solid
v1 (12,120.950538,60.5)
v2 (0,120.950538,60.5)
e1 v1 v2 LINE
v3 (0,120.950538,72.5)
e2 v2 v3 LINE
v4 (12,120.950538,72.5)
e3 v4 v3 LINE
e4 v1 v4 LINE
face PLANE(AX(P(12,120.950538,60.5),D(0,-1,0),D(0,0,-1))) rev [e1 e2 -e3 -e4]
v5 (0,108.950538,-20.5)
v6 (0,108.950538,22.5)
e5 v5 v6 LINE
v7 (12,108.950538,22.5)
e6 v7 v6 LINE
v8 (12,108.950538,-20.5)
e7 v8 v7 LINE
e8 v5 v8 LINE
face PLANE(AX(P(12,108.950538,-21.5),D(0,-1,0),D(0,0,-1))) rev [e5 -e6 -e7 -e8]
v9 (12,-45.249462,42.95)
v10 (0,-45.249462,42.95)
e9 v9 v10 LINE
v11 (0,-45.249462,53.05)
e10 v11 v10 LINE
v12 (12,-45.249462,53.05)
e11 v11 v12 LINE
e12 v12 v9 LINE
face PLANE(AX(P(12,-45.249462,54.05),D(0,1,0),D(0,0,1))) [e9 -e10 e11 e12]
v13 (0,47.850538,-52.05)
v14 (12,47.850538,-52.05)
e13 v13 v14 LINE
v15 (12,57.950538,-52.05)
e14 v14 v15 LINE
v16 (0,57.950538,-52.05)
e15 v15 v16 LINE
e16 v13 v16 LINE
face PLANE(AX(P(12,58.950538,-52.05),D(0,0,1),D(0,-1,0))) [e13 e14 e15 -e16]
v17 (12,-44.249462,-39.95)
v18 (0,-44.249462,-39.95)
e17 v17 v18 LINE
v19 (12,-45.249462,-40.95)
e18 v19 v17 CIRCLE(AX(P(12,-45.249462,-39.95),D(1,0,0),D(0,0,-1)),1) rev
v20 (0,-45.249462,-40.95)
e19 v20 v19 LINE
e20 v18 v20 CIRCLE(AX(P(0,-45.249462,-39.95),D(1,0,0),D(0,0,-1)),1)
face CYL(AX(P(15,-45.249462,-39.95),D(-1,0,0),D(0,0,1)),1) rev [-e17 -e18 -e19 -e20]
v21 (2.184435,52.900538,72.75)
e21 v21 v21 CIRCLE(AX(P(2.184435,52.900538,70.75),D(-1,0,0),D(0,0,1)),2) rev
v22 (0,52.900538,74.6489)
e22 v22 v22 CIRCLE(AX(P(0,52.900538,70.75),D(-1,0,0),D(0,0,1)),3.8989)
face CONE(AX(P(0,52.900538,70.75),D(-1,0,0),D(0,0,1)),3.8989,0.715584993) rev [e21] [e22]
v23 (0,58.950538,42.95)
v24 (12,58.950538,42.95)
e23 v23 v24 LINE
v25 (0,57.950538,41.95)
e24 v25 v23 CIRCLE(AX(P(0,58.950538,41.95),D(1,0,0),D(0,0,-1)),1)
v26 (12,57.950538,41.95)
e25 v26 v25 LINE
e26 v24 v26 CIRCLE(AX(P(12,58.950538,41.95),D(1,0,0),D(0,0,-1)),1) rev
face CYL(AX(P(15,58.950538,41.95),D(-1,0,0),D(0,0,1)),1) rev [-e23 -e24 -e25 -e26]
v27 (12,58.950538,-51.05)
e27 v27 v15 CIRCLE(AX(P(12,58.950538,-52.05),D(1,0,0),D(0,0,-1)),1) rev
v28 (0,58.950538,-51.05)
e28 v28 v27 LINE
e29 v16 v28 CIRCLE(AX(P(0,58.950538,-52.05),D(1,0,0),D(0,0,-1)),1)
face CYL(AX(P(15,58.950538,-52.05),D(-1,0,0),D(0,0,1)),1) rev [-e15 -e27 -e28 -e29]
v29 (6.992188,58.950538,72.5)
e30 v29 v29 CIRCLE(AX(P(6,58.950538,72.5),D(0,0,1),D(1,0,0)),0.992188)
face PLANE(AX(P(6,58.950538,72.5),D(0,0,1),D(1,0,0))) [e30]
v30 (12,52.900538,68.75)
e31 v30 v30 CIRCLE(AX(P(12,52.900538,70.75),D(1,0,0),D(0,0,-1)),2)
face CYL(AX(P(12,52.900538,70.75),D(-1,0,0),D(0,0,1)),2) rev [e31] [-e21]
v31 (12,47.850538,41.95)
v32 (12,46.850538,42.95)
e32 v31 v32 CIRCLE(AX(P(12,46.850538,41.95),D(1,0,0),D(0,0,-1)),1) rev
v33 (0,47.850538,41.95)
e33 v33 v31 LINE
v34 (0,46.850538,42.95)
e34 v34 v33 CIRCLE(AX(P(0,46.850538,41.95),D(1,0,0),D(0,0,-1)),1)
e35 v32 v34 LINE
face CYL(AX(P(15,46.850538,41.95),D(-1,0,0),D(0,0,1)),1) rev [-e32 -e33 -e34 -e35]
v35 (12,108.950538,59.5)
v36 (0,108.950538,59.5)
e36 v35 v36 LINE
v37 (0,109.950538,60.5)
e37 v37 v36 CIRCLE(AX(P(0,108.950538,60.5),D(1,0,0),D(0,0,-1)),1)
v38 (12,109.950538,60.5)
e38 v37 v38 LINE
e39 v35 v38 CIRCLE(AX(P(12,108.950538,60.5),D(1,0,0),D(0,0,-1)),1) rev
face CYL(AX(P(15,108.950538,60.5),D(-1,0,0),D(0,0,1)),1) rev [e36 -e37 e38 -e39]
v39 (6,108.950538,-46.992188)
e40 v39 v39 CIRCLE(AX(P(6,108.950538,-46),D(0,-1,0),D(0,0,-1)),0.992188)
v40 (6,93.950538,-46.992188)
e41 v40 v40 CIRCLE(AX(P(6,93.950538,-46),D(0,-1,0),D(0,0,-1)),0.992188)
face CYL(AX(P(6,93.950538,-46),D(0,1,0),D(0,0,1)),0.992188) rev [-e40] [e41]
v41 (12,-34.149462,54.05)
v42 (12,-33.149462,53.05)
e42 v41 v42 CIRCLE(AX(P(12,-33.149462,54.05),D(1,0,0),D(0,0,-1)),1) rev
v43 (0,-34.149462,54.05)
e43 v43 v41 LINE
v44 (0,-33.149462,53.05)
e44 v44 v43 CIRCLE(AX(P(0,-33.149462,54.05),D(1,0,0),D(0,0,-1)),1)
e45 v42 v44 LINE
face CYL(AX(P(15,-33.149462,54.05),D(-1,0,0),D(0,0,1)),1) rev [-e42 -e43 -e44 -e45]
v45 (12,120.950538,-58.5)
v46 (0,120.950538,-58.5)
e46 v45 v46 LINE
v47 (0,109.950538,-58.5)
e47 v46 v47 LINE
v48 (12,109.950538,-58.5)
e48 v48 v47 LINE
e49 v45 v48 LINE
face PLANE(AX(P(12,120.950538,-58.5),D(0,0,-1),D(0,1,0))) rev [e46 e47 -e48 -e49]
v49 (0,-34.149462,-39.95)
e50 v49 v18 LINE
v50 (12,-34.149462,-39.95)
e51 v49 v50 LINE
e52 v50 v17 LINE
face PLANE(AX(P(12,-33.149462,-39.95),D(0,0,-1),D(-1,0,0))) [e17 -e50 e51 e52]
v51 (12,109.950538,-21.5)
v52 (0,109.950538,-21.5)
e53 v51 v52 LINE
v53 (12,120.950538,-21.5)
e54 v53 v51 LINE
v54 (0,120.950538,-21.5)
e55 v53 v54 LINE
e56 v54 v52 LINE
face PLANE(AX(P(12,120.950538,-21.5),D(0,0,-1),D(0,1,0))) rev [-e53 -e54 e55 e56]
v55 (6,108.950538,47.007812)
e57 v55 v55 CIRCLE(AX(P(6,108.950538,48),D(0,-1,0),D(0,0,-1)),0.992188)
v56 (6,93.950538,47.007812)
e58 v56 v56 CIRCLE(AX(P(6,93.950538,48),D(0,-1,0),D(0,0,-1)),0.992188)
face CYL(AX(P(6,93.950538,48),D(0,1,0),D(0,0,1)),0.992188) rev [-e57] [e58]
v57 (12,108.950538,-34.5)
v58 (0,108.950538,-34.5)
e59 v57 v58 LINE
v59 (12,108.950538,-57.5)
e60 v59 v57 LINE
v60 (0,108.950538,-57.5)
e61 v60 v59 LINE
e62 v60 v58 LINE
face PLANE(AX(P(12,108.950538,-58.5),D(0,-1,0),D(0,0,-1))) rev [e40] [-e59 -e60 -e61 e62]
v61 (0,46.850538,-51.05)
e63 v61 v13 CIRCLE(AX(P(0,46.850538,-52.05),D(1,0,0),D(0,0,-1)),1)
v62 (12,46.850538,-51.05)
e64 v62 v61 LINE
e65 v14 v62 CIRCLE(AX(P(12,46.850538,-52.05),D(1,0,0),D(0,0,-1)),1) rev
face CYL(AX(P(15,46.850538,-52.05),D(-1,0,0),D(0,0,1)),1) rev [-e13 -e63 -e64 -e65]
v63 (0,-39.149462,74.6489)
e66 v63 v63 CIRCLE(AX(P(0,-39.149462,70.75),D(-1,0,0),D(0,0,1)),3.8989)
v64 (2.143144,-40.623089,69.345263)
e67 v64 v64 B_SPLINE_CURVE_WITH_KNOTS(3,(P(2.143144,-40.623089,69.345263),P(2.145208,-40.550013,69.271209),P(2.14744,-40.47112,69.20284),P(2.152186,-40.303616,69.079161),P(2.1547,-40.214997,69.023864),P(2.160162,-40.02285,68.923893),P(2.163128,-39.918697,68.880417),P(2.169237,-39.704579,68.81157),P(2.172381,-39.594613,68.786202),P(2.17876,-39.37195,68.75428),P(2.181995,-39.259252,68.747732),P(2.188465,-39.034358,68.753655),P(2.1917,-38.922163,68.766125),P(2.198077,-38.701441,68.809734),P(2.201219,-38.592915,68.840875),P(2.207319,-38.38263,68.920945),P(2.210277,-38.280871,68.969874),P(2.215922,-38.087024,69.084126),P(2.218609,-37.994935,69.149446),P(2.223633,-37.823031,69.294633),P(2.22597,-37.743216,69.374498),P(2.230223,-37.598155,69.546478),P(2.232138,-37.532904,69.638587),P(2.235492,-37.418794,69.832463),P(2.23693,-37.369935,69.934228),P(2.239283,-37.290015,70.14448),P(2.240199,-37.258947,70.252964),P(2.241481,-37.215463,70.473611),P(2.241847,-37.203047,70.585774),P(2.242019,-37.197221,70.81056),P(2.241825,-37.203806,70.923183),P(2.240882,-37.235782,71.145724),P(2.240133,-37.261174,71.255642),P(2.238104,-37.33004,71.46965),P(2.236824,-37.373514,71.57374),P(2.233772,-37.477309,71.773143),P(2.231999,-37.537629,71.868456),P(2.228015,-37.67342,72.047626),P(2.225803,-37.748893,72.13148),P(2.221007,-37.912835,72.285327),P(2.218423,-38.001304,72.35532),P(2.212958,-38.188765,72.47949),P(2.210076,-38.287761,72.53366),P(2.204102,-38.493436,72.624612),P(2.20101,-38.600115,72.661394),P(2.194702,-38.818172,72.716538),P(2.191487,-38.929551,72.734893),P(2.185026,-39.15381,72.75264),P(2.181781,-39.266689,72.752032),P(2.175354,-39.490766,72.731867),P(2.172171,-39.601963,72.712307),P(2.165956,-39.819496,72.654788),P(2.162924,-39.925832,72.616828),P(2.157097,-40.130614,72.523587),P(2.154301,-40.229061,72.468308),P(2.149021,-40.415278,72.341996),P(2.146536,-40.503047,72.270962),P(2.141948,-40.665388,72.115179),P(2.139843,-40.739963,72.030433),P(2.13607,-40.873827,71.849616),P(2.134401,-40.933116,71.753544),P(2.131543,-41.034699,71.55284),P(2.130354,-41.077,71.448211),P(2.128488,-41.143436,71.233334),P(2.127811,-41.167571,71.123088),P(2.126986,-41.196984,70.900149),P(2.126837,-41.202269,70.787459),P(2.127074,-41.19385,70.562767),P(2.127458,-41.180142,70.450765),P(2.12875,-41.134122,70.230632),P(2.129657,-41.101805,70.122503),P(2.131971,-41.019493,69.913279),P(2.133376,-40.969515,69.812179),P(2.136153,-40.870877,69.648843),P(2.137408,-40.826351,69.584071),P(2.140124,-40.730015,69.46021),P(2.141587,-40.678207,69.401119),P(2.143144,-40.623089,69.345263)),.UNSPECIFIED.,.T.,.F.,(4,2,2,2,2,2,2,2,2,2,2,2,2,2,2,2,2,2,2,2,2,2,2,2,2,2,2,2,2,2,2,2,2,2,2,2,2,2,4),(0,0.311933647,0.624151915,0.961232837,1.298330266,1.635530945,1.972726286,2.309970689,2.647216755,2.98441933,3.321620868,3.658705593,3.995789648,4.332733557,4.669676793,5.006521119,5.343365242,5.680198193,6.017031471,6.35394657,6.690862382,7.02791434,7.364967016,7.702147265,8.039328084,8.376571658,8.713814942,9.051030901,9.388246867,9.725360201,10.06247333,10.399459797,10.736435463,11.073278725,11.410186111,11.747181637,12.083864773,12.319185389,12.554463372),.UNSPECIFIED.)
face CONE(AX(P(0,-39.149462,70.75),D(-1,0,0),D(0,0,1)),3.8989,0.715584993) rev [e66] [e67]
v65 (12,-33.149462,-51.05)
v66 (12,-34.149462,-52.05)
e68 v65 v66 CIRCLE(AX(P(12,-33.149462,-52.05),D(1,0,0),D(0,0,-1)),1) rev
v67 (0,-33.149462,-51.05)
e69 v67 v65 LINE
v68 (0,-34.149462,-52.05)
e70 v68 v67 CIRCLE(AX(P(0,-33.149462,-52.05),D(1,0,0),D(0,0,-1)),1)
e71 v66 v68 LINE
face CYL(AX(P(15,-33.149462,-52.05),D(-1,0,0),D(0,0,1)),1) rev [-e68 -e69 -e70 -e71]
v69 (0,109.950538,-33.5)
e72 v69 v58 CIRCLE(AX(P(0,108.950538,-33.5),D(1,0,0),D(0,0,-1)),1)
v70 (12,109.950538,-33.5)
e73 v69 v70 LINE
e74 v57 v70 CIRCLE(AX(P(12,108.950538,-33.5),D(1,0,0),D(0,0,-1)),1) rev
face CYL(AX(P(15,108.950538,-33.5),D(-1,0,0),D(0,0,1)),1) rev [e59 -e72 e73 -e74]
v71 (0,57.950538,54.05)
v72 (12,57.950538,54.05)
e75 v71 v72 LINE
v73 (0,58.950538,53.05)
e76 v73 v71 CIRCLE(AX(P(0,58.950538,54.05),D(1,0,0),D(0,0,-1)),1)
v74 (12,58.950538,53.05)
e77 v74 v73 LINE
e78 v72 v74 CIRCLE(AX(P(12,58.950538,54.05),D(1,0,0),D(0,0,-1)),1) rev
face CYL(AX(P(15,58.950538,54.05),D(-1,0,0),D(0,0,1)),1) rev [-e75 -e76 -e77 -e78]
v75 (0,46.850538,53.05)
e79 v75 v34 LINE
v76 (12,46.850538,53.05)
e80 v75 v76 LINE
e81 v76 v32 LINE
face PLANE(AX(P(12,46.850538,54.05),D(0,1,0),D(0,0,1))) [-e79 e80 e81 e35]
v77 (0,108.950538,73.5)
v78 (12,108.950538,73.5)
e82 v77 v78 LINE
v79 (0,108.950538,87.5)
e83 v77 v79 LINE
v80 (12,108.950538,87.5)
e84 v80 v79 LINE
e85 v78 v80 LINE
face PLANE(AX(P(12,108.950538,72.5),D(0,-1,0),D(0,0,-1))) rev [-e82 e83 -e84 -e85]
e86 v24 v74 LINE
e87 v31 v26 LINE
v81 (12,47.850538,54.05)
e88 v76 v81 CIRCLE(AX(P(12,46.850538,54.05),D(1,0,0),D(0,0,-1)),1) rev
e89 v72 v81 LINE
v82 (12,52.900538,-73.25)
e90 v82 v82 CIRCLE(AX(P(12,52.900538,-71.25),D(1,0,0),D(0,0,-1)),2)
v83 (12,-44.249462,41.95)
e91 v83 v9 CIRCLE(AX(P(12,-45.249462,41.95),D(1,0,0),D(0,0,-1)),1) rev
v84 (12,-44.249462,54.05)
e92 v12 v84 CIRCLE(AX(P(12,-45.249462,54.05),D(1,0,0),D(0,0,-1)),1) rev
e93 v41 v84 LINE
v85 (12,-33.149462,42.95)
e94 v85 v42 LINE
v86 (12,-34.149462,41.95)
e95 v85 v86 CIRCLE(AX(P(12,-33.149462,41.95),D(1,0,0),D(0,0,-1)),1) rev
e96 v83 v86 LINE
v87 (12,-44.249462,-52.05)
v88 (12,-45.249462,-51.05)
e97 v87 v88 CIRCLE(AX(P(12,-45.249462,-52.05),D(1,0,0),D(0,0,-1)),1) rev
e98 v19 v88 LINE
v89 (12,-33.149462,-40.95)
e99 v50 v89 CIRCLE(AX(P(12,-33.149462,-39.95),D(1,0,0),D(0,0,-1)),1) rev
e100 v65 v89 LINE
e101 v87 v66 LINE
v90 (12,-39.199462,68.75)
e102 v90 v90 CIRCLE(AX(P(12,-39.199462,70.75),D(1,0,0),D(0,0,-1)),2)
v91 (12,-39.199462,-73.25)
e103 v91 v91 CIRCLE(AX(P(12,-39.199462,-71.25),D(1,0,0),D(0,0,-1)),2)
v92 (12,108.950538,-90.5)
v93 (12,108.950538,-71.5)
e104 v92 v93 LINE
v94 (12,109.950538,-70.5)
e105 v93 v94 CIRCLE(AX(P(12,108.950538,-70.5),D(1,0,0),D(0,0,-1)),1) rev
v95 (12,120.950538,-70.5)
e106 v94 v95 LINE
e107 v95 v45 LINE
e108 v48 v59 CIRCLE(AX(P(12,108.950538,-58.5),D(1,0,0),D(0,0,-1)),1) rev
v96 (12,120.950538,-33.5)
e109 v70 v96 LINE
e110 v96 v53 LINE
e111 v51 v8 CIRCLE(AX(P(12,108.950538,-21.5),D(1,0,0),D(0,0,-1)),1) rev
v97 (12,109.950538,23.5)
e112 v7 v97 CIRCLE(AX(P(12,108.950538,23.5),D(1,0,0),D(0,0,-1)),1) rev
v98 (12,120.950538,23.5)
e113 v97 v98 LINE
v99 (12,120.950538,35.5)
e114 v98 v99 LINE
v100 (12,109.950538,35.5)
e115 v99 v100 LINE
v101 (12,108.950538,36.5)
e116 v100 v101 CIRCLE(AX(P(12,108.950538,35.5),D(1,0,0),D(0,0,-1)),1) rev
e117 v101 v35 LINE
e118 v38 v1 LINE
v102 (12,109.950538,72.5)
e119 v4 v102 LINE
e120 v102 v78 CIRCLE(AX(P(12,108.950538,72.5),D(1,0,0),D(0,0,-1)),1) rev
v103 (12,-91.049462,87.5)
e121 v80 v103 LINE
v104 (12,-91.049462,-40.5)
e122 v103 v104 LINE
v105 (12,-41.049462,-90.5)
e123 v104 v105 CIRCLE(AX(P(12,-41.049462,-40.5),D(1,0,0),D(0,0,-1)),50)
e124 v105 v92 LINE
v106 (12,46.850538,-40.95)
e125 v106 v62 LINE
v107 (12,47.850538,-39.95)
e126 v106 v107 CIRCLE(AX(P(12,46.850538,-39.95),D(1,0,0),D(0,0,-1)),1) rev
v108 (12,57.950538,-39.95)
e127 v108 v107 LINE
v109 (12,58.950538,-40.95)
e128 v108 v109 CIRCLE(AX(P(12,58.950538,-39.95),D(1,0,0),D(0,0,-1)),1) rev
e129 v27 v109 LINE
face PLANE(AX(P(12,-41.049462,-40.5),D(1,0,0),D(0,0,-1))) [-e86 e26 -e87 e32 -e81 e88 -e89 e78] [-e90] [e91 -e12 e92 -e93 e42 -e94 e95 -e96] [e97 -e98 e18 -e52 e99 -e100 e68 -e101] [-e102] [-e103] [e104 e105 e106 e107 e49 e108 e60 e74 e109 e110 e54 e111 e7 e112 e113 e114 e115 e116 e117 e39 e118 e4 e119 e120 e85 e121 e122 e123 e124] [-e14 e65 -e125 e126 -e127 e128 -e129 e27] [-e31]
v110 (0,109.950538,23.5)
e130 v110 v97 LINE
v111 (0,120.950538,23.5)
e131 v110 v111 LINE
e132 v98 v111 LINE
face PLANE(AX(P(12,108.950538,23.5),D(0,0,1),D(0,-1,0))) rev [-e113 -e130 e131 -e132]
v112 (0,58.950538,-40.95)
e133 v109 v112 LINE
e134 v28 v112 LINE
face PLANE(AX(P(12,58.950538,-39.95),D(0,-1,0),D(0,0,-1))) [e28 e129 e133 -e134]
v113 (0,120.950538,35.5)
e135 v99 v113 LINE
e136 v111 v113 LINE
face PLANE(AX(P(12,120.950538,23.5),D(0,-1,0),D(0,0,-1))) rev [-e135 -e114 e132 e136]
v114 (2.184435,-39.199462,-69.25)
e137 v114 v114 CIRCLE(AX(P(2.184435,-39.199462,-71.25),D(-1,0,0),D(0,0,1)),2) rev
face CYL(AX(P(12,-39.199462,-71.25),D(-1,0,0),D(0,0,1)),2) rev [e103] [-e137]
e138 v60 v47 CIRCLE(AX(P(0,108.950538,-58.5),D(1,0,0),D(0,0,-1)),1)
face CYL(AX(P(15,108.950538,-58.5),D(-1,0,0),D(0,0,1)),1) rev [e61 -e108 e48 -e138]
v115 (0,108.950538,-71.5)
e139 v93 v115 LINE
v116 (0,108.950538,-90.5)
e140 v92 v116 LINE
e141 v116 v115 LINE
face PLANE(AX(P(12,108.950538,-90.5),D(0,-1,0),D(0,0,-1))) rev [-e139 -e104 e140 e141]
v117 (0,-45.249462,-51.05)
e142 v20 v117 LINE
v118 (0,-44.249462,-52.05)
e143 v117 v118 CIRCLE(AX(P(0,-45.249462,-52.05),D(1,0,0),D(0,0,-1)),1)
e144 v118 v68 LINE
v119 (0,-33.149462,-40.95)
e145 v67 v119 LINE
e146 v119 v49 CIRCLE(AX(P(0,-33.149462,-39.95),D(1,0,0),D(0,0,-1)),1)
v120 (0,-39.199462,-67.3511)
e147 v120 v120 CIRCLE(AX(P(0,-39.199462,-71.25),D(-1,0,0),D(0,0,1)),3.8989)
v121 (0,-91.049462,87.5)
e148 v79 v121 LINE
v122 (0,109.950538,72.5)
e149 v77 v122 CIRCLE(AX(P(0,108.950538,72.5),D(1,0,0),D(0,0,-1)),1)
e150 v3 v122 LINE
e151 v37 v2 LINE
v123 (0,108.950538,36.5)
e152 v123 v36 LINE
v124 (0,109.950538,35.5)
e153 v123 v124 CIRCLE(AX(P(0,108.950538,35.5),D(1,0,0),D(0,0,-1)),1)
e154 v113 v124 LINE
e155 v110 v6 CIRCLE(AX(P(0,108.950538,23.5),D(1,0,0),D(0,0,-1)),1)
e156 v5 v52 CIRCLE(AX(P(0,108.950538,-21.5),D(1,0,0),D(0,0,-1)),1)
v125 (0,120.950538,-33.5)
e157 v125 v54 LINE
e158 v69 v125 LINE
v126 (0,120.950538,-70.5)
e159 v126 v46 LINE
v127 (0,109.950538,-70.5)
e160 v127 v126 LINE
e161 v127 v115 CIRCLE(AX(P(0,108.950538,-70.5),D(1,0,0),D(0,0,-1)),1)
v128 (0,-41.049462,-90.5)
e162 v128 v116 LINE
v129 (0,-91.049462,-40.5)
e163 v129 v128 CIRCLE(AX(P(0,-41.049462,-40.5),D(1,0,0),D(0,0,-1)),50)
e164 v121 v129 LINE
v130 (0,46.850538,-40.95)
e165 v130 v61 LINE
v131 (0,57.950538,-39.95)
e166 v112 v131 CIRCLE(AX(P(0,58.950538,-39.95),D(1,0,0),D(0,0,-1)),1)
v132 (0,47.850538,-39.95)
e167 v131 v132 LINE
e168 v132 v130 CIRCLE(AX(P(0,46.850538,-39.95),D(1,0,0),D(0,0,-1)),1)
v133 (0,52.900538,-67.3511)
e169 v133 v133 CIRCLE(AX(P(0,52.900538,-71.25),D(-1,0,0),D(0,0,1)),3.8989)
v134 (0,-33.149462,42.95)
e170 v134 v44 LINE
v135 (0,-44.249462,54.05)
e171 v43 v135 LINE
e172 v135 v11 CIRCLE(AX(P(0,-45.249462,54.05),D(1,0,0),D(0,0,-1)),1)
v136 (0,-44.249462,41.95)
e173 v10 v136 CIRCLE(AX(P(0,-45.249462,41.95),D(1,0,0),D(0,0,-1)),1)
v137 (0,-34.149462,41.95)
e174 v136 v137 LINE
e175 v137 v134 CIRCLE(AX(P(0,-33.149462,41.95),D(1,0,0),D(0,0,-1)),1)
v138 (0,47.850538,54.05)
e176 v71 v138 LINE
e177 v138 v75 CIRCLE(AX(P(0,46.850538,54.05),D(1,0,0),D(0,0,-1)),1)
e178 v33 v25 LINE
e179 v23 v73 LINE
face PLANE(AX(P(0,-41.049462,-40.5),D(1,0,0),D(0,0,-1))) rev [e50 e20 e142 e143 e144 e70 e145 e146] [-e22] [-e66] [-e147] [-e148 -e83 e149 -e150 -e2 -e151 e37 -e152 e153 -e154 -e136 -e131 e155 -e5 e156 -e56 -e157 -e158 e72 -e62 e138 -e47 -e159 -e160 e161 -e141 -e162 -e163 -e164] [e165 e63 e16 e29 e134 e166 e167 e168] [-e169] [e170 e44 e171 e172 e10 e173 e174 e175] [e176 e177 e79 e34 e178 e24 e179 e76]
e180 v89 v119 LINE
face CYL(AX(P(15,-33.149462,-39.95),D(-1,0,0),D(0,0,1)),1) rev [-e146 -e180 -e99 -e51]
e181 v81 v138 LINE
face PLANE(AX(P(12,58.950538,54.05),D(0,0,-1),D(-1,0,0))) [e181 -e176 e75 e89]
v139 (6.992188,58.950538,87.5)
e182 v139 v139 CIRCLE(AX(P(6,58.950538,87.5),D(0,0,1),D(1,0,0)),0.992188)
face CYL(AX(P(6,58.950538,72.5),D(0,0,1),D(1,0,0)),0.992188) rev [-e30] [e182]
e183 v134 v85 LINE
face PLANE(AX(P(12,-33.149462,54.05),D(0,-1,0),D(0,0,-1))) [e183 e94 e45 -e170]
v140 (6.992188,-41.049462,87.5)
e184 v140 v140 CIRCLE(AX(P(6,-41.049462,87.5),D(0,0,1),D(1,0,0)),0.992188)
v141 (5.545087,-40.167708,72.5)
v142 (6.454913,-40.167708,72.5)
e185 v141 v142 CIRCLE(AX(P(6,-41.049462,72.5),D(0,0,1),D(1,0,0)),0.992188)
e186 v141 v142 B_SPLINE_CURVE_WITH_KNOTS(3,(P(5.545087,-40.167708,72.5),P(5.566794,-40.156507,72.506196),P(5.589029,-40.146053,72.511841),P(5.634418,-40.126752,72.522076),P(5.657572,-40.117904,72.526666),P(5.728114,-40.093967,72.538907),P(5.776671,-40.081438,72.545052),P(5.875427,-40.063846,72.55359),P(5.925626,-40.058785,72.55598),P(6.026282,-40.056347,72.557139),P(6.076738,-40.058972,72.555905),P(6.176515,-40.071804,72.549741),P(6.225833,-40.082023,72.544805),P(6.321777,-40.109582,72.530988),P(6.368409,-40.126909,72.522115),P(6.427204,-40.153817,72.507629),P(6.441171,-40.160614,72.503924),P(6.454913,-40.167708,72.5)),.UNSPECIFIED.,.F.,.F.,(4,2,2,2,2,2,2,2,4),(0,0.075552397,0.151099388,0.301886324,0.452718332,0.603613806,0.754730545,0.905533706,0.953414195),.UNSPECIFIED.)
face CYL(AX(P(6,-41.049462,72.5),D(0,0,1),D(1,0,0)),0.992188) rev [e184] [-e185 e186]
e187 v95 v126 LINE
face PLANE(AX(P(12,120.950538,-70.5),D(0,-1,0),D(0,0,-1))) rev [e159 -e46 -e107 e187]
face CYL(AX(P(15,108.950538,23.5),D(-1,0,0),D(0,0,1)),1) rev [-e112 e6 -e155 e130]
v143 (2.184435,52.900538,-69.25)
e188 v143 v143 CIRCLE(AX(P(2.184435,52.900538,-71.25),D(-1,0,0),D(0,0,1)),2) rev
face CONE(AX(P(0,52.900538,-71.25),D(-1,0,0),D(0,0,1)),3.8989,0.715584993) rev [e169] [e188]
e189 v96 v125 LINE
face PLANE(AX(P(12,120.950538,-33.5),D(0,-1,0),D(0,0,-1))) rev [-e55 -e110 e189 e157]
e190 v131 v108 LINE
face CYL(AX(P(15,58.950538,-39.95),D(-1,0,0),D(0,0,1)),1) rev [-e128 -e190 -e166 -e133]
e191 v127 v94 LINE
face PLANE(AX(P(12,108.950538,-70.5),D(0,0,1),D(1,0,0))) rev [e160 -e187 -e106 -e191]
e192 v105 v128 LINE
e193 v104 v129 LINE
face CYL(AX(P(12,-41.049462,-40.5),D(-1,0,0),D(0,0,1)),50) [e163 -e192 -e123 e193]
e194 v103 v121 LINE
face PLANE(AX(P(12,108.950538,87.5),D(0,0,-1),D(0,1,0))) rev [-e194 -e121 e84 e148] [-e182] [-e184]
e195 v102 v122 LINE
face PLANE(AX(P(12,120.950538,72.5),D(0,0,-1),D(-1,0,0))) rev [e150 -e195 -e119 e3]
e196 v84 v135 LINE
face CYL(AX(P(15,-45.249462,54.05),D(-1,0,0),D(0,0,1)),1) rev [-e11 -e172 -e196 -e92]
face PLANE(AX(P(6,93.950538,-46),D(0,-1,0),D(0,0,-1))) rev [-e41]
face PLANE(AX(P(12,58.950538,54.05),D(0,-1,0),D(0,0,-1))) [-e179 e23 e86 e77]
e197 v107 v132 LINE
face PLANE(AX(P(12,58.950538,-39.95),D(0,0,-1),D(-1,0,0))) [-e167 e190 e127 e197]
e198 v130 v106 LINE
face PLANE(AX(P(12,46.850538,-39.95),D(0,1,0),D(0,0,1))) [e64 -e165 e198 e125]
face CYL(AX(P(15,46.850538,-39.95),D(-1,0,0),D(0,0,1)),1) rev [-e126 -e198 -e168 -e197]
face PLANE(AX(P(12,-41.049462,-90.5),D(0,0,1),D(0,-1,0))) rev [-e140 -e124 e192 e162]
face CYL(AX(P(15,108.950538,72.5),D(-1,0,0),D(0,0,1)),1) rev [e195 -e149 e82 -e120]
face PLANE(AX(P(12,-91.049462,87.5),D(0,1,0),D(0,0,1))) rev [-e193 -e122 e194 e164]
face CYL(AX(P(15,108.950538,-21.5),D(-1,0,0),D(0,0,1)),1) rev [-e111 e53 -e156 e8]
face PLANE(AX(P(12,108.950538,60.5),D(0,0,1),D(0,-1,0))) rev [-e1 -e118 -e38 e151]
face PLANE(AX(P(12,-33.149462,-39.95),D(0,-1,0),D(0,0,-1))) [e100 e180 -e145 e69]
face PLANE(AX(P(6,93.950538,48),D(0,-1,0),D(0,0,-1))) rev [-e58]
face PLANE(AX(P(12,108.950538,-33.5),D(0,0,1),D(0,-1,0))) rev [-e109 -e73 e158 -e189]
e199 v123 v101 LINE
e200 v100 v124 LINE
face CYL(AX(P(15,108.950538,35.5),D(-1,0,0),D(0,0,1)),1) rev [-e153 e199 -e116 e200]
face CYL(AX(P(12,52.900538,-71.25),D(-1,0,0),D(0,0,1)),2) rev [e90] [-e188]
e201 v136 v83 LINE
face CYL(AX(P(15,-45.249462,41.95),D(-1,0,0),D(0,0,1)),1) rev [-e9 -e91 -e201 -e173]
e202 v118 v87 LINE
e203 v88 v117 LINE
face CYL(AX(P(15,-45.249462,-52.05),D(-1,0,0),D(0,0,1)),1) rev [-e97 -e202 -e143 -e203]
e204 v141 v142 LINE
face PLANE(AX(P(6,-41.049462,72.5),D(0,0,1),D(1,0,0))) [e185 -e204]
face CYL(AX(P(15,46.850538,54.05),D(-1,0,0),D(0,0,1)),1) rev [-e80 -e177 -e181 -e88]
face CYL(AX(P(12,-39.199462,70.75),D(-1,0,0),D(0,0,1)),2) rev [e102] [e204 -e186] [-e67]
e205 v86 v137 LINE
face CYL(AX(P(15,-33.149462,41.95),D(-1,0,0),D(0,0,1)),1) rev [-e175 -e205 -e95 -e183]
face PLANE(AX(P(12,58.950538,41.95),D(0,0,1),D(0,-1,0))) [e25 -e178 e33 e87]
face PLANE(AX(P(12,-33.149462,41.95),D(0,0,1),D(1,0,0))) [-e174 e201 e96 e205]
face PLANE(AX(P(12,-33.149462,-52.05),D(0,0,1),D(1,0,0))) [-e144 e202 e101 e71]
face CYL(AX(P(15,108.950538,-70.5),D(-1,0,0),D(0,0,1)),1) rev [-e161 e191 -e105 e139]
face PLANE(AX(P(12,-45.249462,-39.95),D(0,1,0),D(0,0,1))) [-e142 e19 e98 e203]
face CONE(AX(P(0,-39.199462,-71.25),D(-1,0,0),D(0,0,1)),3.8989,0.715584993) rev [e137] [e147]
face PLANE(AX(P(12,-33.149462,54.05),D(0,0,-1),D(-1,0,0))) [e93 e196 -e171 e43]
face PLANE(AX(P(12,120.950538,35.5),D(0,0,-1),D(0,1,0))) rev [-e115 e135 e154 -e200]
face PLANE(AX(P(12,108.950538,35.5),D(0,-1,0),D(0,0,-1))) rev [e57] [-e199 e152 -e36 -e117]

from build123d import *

# Parameters (mm, degrees)
SKETCH1_R           = 2
SKETCH1_W           = 12.1
SKETCH1_H           = 12.1
BOSS_EXTRUDE1_DEPTH = 12
SKETCH2_R           = 0.9921875
CUT_EXTRUDE1_DEPTH  = 15
CUT_EXTRUDE2_START  = 108.950538
SKETCH4_R           = 0.9921875
CUT_EXTRUDE2_DEPTH  = 15
SKETCH5_R           = 1
CUT_EXTRUDE3_DEPTH  = 15


# Read off the part's stored shape, not the designer's step: AdvancedHole1
with BuildPart() as part:
    # Sketch1 → Boss-Extrude1 (new body)
    with BuildSketch(Plane(origin=(0, 0, 0), x_dir=(0, 0, -1), z_dir=(1, 0, 0))):
        with BuildLine():
            Line((-72.5, 120.950537961), (-72.5, 108.950537961))
            Line((-72.5, 108.950537961), (-87.5, 108.950537961))
            Line((-87.5, 108.950537961), (-87.5, -91.049462039))
            Line((-87.5, -91.049462039), (40.5, -91.049462039))
            ThreePointArc((40.5, -91.049462039), (75.855339059, -76.404801099), (90.5, -41.049462039))
            Line((90.5, -41.049462039), (90.5, 108.950537961))
            Line((90.5, 108.950537961), (70.5, 108.950537961))
            Line((70.5, 108.950537961), (70.5, 120.950537961))
            Line((70.5, 120.950537961), (58.5, 120.950537961))
            Line((58.5, 120.950537961), (58.5, 108.950537961))
            Line((58.5, 108.950537961), (33.5, 108.950537961))
            Line((33.5, 108.950537961), (33.5, 120.950537961))
            Line((33.5, 120.950537961), (21.5, 120.950537961))
            Line((21.5, 120.950537961), (21.5, 108.950537961))
            Line((21.5, 108.950537961), (-23.5, 108.950537961))
            Line((-23.5, 108.950537961), (-23.5, 120.950537961))
            Line((-23.5, 120.950537961), (-35.5, 120.950537961))
            Line((-35.5, 120.950537961), (-35.5, 108.950537961))
            Line((-35.5, 108.950537961), (-60.5, 108.950537961))
            Line((-60.5, 108.950537961), (-60.5, 120.950537961))
            Line((-60.5, 120.950537961), (-72.5, 120.950537961))
        make_face()
        with Locations((71.25, 52.900537961)):
            Circle(SKETCH1_R, mode=Mode.SUBTRACT)
        with Locations((71.25, -39.199462039)):
            Circle(SKETCH1_R, mode=Mode.SUBTRACT)
        with Locations((-70.75, 52.900537961)):
            Circle(SKETCH1_R, mode=Mode.SUBTRACT)
        with Locations((-70.75, -39.199462039)):
            Circle(SKETCH1_R, mode=Mode.SUBTRACT)
        with Locations((46, 52.900537961)):
            Rectangle(SKETCH1_W, SKETCH1_H, mode=Mode.SUBTRACT)
        with Locations((46, -39.199462039)):
            Rectangle(SKETCH1_W, SKETCH1_H, mode=Mode.SUBTRACT)
        with Locations((-48, 52.900537961)):
            Rectangle(SKETCH1_W, SKETCH1_H, mode=Mode.SUBTRACT)
        with Locations((-48, -39.199462039)):
            Rectangle(SKETCH1_W, SKETCH1_H, mode=Mode.SUBTRACT)
    extrude(amount=BOSS_EXTRUDE1_DEPTH)

    # Sketch2 → Cut-Extrude1 (cut)
    with BuildSketch(Plane.XY.offset(87.5)):
        with Locations((6, 58.950537961)):
            Circle(SKETCH2_R)
        with Locations((6, -41.049462039)):
            Circle(SKETCH2_R)
    extrude(amount=-CUT_EXTRUDE1_DEPTH, mode=Mode.SUBTRACT)

    # Sketch4 → Cut-Extrude2 (cut)
    with BuildSketch(Plane(origin=(0, 0, 0), x_dir=(1, 0, 0), z_dir=(0, 1, 0)).offset(CUT_EXTRUDE2_START)):
        with Locations(Location((6, 46, 0), (0, 0, 90))):
            Circle(SKETCH4_R)
        with Locations(Location((6, -48, 0), (0, 0, 90))):
            Circle(SKETCH4_R)
    extrude(amount=-CUT_EXTRUDE2_DEPTH, mode=Mode.SUBTRACT)

    # Sketch5 → Cut-Extrude3 (cut)
    with BuildSketch(Plane(origin=(0, 0, 0), x_dir=(0, 0, -1), z_dir=(1, 0, 0))):
        with Locations((-54.05, 58.950537961)):
            Circle(SKETCH5_R)
        with Locations((-41.95, 58.950537961)):
            Circle(SKETCH5_R)
        with Locations((-41.95, 46.850537961)):
            Circle(SKETCH5_R)
        with Locations((-54.05, 46.850537961)):
            Circle(SKETCH5_R)
        with Locations((39.95, 58.950537961)):
            Circle(SKETCH5_R)
        with Locations((52.05, 58.950537961)):
            Circle(SKETCH5_R)
        with Locations((52.05, 46.850537961)):
            Circle(SKETCH5_R)
        with Locations((39.95, 46.850537961)):
            Circle(SKETCH5_R)
        with Locations((-41.95, -33.149462039)):
            Circle(SKETCH5_R)
        with Locations((-54.05, -33.149462039)):
            Circle(SKETCH5_R)
        with Locations((-41.95, -45.249462039)):
            Circle(SKETCH5_R)
        with Locations((-54.05, -45.249462039)):
            Circle(SKETCH5_R)
        with Locations((39.95, -33.149462039)):
            Circle(SKETCH5_R)
        with Locations((52.05, -33.149462039)):
            Circle(SKETCH5_R)
        with Locations((52.05, -45.249462039)):
            Circle(SKETCH5_R)
        with Locations((39.95, -45.249462039)):
            Circle(SKETCH5_R)
        with Locations((21.5, 108.950537961)):
            Circle(SKETCH5_R)
        with Locations((33.5, 108.950537961)):
            Circle(SKETCH5_R)
        with Locations((58.5, 108.950537961)):
            Circle(SKETCH5_R)
        with Locations((70.5, 108.950537961)):
            Circle(SKETCH5_R)
        with Locations((-23.5, 108.950537961)):
            Circle(SKETCH5_R)
        with Locations((-35.5, 108.950537961)):
            Circle(SKETCH5_R)
        with Locations((-60.5, 108.950537961)):
            Circle(SKETCH5_R)
        with Locations((-72.5, 108.950537961)):
            Circle(SKETCH5_R)
    extrude(amount=CUT_EXTRUDE3_DEPTH, mode=Mode.SUBTRACT)

    # AdvancedHole1 outline → AdvancedHole1 (revolve, cut)
    with BuildSketch(Plane(origin=(0, -39.199462039, -71.25), x_dir=(0, 1, 0), z_dir=(0, 0, -1))):
        Polygon((3.8989, 0), (2, 2.184434568), (2, 0), align=None)
    revolve(axis=Axis((0, -39.199462039, -71.25), (1, 0, 0)), mode=Mode.SUBTRACT)

    # AdvancedHole1 2 outline → AdvancedHole1 2 (revolve, cut)
    with BuildSketch(Plane(origin=(0, -39.149462039, 70.75), x_dir=(0, 1, 0), z_dir=(0, 0, -1))):
        Polygon((3.8989, 0), (1.949985604, 2.24196955), (1.949985604, 0), align=None)
    revolve(axis=Axis((0, -39.149462039, 70.75), (1, 0, 0)), mode=Mode.SUBTRACT)

    # AdvancedHole1 3 outline → AdvancedHole1 3 (revolve, cut)
    with BuildSketch(Plane(origin=(0, 52.900537961, -71.25), x_dir=(0, 1, 0), z_dir=(0, 0, -1))):
        Polygon((3.8989, 0), (2, 2.184434568), (2, 0), align=None)
    revolve(axis=Axis((0, 52.900537961, -71.25), (1, 0, 0)), mode=Mode.SUBTRACT)

    # AdvancedHole1 4 outline → AdvancedHole1 4 (revolve, cut)
    with BuildSketch(Plane(origin=(0, 52.900537961, 70.75), x_dir=(0, 1, 0), z_dir=(0, 0, -1))):
        Polygon((3.8989, 0), (2, 2.184434568), (2, 0), align=None)
    revolve(axis=Axis((0, 52.900537961, 70.75), (1, 0, 0)), mode=Mode.SUBTRACT)


solid = part.part
